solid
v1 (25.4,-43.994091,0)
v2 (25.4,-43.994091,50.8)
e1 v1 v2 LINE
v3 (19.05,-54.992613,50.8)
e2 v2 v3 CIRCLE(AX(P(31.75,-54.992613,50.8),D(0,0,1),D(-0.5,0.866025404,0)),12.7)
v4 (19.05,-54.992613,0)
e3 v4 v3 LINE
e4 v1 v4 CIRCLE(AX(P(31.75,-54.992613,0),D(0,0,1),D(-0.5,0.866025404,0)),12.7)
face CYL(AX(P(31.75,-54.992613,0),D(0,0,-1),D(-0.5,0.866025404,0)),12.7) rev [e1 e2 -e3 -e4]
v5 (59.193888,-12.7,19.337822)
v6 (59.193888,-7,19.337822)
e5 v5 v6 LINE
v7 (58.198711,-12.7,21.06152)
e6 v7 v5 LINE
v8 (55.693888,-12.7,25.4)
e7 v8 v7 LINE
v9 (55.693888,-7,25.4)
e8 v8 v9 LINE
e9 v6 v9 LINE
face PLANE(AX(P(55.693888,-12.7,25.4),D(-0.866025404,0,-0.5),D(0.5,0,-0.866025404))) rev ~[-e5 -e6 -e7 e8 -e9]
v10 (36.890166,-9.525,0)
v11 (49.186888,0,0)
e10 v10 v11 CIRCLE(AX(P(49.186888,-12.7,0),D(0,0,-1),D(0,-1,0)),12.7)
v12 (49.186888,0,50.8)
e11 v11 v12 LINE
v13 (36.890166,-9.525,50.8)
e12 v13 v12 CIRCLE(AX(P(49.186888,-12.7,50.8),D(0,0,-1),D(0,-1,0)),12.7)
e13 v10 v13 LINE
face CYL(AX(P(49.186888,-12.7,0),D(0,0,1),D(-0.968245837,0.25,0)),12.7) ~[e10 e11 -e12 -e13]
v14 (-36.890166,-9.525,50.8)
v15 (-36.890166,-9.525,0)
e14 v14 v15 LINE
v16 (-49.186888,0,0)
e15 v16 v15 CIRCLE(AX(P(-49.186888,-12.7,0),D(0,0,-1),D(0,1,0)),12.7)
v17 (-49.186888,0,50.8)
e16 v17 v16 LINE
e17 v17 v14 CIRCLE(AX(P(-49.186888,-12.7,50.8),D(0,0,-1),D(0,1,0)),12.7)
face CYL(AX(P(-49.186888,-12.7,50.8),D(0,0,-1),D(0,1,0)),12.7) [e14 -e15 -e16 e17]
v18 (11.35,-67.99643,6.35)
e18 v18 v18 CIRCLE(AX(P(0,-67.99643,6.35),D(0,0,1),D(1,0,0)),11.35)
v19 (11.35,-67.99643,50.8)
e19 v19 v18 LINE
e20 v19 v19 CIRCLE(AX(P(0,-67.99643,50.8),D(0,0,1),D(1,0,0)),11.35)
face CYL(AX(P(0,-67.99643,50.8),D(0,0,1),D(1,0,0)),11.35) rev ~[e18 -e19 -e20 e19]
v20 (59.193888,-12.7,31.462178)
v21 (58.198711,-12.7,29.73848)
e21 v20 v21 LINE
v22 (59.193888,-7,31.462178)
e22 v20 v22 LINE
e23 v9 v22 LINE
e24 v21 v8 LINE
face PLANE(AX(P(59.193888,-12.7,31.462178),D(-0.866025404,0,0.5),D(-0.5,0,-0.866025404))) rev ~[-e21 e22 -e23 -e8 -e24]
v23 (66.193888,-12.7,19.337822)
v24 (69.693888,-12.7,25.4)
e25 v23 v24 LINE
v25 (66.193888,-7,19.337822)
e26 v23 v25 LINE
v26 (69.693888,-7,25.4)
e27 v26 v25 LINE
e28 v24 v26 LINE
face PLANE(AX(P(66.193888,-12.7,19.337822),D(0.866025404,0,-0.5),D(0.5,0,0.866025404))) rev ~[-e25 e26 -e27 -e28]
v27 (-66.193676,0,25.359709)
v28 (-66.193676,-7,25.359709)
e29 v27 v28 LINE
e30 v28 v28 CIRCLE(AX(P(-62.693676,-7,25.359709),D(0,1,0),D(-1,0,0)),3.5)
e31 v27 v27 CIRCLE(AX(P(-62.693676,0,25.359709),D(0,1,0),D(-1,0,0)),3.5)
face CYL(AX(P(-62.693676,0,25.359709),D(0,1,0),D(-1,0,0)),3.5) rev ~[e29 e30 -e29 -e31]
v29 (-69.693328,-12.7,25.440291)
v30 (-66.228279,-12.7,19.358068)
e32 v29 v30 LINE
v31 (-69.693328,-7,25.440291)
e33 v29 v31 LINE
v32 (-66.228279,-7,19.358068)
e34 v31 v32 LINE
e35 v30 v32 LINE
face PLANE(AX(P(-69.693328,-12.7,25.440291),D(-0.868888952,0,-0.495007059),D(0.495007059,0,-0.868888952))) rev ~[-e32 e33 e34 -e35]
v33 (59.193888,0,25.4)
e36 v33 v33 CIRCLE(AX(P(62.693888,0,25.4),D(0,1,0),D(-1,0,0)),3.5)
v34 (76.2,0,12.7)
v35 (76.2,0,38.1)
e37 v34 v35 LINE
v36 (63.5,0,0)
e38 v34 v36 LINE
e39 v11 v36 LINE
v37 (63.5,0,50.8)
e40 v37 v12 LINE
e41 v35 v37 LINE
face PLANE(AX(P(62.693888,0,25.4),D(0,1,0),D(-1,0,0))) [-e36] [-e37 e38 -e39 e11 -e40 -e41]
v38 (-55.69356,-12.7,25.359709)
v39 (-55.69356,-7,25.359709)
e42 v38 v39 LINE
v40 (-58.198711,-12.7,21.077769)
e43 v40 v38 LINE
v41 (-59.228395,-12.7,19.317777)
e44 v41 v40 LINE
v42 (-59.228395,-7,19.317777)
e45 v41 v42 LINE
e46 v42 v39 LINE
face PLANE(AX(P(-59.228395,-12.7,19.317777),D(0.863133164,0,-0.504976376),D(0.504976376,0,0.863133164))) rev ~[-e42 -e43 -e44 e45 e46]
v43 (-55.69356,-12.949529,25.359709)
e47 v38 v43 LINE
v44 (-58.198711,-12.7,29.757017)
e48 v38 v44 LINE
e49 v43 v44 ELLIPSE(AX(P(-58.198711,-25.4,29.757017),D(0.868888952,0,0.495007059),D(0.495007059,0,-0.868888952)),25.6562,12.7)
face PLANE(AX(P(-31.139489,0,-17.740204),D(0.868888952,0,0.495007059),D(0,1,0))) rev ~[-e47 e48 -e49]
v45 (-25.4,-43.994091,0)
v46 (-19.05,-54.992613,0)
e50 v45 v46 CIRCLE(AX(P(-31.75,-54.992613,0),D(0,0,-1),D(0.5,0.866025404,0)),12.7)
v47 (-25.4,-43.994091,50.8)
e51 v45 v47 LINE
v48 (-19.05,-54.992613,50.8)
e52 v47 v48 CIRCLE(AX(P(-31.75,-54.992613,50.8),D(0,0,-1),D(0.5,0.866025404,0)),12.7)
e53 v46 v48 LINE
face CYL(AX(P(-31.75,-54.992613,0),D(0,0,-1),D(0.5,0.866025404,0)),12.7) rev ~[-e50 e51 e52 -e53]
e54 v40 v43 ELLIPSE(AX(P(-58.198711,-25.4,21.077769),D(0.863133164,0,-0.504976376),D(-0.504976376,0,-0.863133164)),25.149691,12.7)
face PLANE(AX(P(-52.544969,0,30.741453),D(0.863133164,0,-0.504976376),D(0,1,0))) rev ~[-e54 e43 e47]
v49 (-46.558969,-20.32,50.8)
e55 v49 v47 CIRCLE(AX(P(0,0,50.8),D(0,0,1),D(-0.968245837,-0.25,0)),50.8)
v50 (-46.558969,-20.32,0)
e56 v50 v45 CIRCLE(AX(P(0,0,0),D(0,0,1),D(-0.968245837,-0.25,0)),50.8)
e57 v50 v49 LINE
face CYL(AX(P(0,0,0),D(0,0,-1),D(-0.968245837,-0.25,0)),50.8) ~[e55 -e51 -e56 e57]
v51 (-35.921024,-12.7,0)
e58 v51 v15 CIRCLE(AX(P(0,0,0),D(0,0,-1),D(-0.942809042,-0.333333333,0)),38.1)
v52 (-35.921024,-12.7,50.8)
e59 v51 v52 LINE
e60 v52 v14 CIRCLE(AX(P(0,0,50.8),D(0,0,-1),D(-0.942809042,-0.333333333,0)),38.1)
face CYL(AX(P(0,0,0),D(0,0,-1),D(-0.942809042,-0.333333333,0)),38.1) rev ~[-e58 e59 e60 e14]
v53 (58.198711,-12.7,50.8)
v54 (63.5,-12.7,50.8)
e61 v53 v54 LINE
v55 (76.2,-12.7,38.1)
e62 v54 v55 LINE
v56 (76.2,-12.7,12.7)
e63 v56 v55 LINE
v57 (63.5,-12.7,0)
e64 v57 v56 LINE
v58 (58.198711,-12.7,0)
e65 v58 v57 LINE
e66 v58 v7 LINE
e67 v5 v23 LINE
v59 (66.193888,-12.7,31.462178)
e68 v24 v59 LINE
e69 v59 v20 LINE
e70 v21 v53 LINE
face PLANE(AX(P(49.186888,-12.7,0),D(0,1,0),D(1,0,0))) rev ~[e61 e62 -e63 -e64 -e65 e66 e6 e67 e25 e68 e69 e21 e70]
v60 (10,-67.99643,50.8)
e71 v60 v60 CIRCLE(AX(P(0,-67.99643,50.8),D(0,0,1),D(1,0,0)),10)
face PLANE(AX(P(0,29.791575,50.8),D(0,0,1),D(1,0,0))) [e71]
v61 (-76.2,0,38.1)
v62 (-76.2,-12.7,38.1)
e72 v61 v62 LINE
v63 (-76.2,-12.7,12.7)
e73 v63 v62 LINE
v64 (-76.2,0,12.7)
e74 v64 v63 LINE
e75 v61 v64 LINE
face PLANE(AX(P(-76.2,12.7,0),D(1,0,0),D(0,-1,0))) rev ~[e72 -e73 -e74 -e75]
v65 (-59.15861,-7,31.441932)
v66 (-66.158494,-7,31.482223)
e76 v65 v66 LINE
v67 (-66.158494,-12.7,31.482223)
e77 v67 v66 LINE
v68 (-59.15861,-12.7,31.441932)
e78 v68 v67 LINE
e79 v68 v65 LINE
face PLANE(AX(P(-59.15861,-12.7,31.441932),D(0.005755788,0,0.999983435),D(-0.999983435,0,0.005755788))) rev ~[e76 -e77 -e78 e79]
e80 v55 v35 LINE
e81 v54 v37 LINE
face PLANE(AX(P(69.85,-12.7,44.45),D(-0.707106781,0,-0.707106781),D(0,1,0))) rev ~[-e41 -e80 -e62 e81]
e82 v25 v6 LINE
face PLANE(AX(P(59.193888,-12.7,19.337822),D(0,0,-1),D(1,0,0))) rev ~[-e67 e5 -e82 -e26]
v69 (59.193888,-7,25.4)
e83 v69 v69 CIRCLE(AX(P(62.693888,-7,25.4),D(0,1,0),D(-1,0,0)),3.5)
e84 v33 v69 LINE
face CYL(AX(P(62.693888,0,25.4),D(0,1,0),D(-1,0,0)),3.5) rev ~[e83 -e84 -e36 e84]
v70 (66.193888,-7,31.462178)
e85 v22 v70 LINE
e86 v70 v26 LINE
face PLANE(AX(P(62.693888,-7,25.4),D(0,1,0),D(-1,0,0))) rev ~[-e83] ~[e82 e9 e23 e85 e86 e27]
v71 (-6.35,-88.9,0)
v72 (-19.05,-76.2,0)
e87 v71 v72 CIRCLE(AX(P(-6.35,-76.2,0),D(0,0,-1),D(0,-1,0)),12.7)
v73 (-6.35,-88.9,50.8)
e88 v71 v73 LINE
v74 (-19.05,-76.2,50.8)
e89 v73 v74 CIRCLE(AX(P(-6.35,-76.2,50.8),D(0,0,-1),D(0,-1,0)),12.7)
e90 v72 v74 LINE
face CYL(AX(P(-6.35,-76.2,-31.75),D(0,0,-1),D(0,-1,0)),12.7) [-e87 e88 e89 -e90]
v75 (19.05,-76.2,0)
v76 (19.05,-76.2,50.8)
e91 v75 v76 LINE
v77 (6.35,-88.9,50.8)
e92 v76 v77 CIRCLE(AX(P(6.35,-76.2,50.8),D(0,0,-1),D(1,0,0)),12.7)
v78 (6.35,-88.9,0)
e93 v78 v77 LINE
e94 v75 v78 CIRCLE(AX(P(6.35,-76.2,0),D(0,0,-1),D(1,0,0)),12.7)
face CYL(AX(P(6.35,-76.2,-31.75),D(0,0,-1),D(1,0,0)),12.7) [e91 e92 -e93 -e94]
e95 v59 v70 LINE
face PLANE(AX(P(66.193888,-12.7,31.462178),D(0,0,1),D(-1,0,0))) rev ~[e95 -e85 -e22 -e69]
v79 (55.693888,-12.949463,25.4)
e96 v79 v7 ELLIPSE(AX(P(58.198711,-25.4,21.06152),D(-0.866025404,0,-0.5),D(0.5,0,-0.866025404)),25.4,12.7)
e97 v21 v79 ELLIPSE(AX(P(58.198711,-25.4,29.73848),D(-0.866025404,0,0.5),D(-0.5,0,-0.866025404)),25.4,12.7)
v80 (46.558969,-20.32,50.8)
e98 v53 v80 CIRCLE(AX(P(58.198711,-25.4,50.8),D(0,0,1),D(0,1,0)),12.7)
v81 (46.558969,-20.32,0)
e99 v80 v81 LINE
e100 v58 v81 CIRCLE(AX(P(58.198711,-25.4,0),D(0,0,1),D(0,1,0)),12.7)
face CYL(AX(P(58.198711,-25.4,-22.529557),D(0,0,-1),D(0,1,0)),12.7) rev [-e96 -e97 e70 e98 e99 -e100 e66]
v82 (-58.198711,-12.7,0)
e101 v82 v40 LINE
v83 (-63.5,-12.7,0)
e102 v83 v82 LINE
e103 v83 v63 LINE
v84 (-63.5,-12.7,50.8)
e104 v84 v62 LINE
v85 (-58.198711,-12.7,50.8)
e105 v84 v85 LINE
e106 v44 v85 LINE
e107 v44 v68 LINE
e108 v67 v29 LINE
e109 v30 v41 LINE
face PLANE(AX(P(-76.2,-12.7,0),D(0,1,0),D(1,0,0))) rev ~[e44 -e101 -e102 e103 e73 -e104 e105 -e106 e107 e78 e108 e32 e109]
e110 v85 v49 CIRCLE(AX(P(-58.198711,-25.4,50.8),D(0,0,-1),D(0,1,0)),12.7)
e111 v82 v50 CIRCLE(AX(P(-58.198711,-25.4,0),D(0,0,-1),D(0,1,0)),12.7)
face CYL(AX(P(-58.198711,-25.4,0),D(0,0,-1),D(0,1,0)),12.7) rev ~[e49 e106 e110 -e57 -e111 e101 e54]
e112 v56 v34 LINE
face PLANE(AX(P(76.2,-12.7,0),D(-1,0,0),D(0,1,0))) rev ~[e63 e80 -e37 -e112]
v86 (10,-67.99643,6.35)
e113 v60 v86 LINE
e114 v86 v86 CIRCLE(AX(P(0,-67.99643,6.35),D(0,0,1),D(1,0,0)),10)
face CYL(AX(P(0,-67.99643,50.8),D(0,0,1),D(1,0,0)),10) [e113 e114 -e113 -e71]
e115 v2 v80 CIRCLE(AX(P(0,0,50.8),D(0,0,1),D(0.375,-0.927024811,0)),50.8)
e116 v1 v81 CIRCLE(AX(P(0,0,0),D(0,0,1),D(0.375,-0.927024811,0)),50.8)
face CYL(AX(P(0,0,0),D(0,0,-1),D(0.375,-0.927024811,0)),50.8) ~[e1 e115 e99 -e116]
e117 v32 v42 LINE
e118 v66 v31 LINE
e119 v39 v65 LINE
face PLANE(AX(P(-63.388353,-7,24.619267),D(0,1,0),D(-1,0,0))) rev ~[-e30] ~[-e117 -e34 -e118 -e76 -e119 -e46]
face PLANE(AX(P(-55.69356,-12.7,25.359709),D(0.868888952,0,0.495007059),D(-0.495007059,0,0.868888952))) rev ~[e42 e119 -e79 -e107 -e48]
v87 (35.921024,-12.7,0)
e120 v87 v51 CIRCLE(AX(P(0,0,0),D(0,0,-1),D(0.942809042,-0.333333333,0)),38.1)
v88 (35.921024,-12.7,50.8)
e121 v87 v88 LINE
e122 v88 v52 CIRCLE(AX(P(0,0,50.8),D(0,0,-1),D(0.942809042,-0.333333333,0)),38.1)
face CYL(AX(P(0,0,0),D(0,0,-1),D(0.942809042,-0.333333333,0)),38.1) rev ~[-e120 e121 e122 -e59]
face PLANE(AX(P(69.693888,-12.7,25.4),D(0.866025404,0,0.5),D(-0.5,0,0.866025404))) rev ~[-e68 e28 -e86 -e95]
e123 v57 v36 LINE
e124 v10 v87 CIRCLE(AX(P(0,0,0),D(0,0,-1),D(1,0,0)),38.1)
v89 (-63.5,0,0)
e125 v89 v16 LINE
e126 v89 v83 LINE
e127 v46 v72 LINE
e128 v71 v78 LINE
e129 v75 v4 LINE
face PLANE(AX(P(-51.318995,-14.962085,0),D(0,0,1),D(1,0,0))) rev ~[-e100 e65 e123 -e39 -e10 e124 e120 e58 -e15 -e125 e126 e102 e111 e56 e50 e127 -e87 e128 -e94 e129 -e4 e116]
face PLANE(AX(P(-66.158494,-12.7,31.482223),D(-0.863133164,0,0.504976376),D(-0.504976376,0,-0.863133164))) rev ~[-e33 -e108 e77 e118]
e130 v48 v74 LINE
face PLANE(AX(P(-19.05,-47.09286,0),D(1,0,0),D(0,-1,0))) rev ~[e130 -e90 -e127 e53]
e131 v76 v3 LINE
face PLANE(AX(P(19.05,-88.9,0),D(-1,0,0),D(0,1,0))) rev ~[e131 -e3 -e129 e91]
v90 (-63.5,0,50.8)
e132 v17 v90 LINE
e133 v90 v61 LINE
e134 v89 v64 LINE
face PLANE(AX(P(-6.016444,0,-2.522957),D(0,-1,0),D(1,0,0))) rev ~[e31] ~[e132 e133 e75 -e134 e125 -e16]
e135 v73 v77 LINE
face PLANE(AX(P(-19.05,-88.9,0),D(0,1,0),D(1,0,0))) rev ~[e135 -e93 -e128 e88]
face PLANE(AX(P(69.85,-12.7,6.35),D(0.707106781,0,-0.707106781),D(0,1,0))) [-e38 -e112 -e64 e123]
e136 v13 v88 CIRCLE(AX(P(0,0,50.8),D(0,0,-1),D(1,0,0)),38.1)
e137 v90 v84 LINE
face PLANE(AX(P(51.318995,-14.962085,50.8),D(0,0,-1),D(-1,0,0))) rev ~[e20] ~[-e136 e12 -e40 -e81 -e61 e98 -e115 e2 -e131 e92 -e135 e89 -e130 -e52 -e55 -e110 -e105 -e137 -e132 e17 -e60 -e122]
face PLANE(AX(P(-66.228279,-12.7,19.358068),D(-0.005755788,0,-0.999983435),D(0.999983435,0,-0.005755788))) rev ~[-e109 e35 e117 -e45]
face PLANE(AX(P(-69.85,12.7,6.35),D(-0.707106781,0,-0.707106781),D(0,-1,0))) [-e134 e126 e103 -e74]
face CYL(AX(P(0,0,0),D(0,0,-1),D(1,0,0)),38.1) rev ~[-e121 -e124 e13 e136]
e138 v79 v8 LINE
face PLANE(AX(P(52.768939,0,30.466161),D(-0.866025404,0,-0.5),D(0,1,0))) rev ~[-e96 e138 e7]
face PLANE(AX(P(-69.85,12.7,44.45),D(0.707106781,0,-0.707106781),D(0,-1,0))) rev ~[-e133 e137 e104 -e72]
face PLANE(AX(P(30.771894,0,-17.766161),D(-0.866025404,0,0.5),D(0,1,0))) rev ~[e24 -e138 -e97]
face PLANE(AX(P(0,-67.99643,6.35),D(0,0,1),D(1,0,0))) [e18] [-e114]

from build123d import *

# Parameters (mm, degrees)
F1_DEPTH     = 50.8
F3_DEPTH     = 12.7
F4_SIZE      = 12.7
F5_R         = 11.35
F5_R_2       = 10
F6_DEPTH     = 44.45
F7_T1_DEPTH  = 50.8
F7_T6_DEPTH  = 73.3295570728
F7_T11_DEPTH = 73.3295570728
F7_T16_DEPTH = 73.3295570728
F7_T21_DEPTH = 73.3295570728
F7_T23_DEPTH = 114.3
F8_R         = 3.5
F9_DEPTH     = 50.801
F10_W        = 183.8439181447
F10_H        = 157.3934331536
F11_DEPTH    = 63.5
F12_R        = 12.7
F13_R        = 3.5
F13_W        = 17.6573731005
F13_H        = 18.0775066838
F14_DEPTH    = 7


# Not quite as in the source:
# - a fillet or chamfer that OpenCascade refuses, or shapes differently, is made with other operations: its cross-section is extruded or revolved along the edge and cut away or added


with BuildPart() as f1:
    # F0 (on Top) → F1 (new body)
    with BuildSketch(Plane.XY):
        with BuildLine():
            ThreePointArc((-35.9210244843, 12.7), (0, 38.1), (35.9210244843, 12.7))
            Line((35.9210244843, 12.7), (49.1868884968, 12.7))
            ThreePointArc((49.1868884968, 12.7), (0, 50.8), (-49.1868884968, 12.7))
            Line((-49.1868884968, 12.7), (-35.9210244843, 12.7))
        make_face()
        with BuildLine():
            ThreePointArc((-49.1868884968, -12.7), (-50.8, 0), (-49.1868884968, 12.7))
            Line((-49.1868884968, 12.7), (-76.2, 12.7))
            Line((-76.2, 12.7), (-76.2, -12.7))
            Line((-76.2, -12.7), (-49.1868884968, -12.7))
        make_face()
        with BuildLine():
            ThreePointArc((-35.9210244843, -12.7), (-38.1, 0), (-35.9210244843, 12.7))
            Line((-35.9210244843, 12.7), (-49.1868884968, 12.7))
            ThreePointArc((-49.1868884968, 12.7), (-50.8, 0), (-49.1868884968, -12.7))
            Line((-49.1868884968, -12.7), (-35.9210244843, -12.7))
        make_face()
        with BuildLine():
            ThreePointArc((35.9210244843, 12.7), (37.5513051228, 6.4427853895), (38.1, 0))
            ThreePointArc((38.1, 0), (37.5513051228, -6.4427853895), (35.9210244843, -12.7))
            Line((35.9210244843, -12.7), (49.1868884968, -12.7))
            ThreePointArc((49.1868884968, -12.7), (50.3951085704, -6.4010180581), (50.8, 0))
            ThreePointArc((50.8, 0), (50.3951085704, 6.4010180581), (49.1868884968, 12.7))
            Line((49.1868884968, 12.7), (35.9210244843, 12.7))
        make_face()
        with BuildLine():
            Line((76.2, 12.7), (49.1868884968, 12.7))
            ThreePointArc((49.1868884968, 12.7), (50.3951085704, 6.4010180581), (50.8, 0))
            ThreePointArc((50.8, 0), (50.3951085704, -6.4010180581), (49.1868884968, -12.7))
            Line((49.1868884968, -12.7), (76.2, -12.7))
            Line((76.2, -12.7), (76.2, 12.7))
        make_face()
        with BuildLine():
            ThreePointArc((-19.05, -32.9955678842), (-29.2989914869, -24.3552683798), (-35.9210244843, -12.7))
            Line((-35.9210244843, -12.7), (-49.1868884968, -12.7))
            ThreePointArc((-49.1868884968, -12.7), (-38.2071387235, -33.479165918), (-19.05, -47.0928603931))
            Line((-19.05, -47.0928603931), (-19.05, -32.9955678842))
        make_face()
        with BuildLine():
            Line((49.1868884968, -12.7), (35.9210244843, -12.7))
            ThreePointArc((35.9210244843, -12.7), (29.2989914869, -24.3552683798), (19.05, -32.9955678842))
            Line((19.05, -32.9955678842), (19.05, -47.0928603931))
            ThreePointArc((19.05, -47.0928603931), (38.2071387235, -33.479165918), (49.1868884968, -12.7))
        make_face()
        with BuildLine():
            Line((19.05, -47.0928603931), (19.05, -32.9955678842))
            ThreePointArc((19.05, -32.9955678842), (0, -38.1), (-19.05, -32.9955678842))
            Line((-19.05, -32.9955678842), (-19.05, -47.0928603931))
            ThreePointArc((-19.05, -47.0928603931), (0, -50.8), (19.05, -47.0928603931))
        make_face()
        with BuildLine():
            Line((19.05, -88.9), (19.05, -47.0928603931))
            ThreePointArc((19.05, -47.0928603931), (0, -50.8), (-19.05, -47.0928603931))
            Line((-19.05, -47.0928603931), (-19.05, -88.9))
            Line((-19.05, -88.9), (19.05, -88.9))
        make_face()
    extrude(amount=F1_DEPTH)

    # F2 (on face) → F3 (cut)
    with BuildSketch(Plane.XZ.offset(12.7)):
        Polygon((-55.6935602012, 25.3597094836), (-59.1586096141, 31.4419321502), (-66.1584936613, 31.4822226666), (-69.6933282956, 25.4402905164), (-66.2282788827, 19.3580678498), (-59.2283948355, 19.3177773334), align=None)
        Polygon((59.1938884968, 31.4621778265), (55.6938884968, 25.4), (59.1938884968, 19.3378221735), (66.1938884968, 19.3378221735), (69.6938884968, 25.4), (66.1938884968, 31.4621778265), align=None)
    extrude(amount=-F3_DEPTH, mode=Mode.SUBTRACT)

    # F4
    f4_edges = [f1.edges().sort_by_distance(p)[0] for p in [
        (-76.2, 0, 50.8),
        (-76.2, 0, 0),
        (76.2, 0, 50.8),
        (76.2, 0, 0),
    ]]
    chamfer(f4_edges, length=F4_SIZE)

    # F5 (on face) → F6 (cut)
    with BuildSketch(Plane.XY.offset(50.8)):
        with Locations((0, -67.9964301965)):
            Circle(F5_R)
        with Locations((0, -67.9964301965)):
            Circle(F5_R_2, mode=Mode.SUBTRACT)
    extrude(amount=-F6_DEPTH, mode=Mode.SUBTRACT)

    # F7: fillet of radius 12.7 on 8 edges, made by hand

    # F7_s2 → F7_t1 (join)
    with BuildSketch(Plane.XY):
        with BuildLine():
            ThreePointArc((-25.4, -43.9940905122), (-20.7514773719, -48.6426131403), (-19.05, -54.9926131403))
            Line((-19.05, -54.9926131403), (-19.05, -47.0928603931))
            ThreePointArc((-19.05, -47.0928603931), (-22.2789411484, -45.6540116672), (-25.4, -43.9940905122))
        make_face()
        with BuildLine():
            ThreePointArc((25.4, -43.9940905122), (20.7514773719, -48.6426131403), (19.05, -54.9926131403))
            Line((19.05, -54.9926131403), (19.05, -47.0928603931))
            ThreePointArc((19.05, -47.0928603931), (22.2789411484, -45.6540116672), (25.4, -43.9940905122))
        make_face()
    extrude(amount=F7_T1_DEPTH)


with BuildPart() as f7_tool4:
    # F7_s5 → F7_t6 (new body)
    with BuildSketch(Plane.XY):
        with BuildLine():
            ThreePointArc((58.1987113259, -12.7), (51.2426348456, -14.774417663), (46.5589690608, -20.32))
            ThreePointArc((46.5589690608, -20.32), (48.0243002017, -16.562203662), (49.1868884968, -12.7))
            Line((49.1868884968, -12.7), (58.1987113259, -12.7))
        make_face()
    extrude(amount=F7_T6_DEPTH)

    split(bisect_by=Plane(origin=(52.7689390007, 0, 30.4661611369), x_dir=(0, 1, 0), z_dir=(-0.8660254038, 0, -0.5)), keep=Keep.TOP)


with BuildPart() as f1_1:
    add(f1.part)

    # F7_t3: union F7_tool4
    add(f7_tool4.part)


with BuildPart() as f7_tool9:
    # F7_s10 → F7_t11 (new body)
    with BuildSketch(Plane.XY.offset(-22.5295570728)):
        with BuildLine():
            ThreePointArc((58.1987113259, -12.7), (51.2426348456, -14.774417663), (46.5589690608, -20.32))
            ThreePointArc((46.5589690608, -20.32), (48.0243002017, -16.562203662), (49.1868884968, -12.7))
            Line((49.1868884968, -12.7), (58.1987113259, -12.7))
        make_face()
    extrude(amount=F7_T11_DEPTH)

    split(bisect_by=Plane(origin=(30.7718937446, 0, -17.7661611369), x_dir=(0, 1, 0), z_dir=(-0.8660254038, 0, 0.5)), keep=Keep.TOP)


with BuildPart() as f1_2:
    add(f1_1.part)

    # F7_t8: union F7_tool9
    add(f7_tool9.part)


with BuildPart() as f7_tool14:
    # F7_s15 → F7_t16 (new body)
    with BuildSketch(Plane.XY):
        with BuildLine():
            ThreePointArc((-58.1987113259, -12.7), (-51.2426348456, -14.774417663), (-46.5589690608, -20.32))
            ThreePointArc((-46.5589690608, -20.32), (-48.0243002017, -16.562203662), (-49.1868884968, -12.7))
            Line((-49.1868884968, -12.7), (-58.1987113259, -12.7))
        make_face()
    extrude(amount=F7_T16_DEPTH)

    split(bisect_by=Plane(origin=(-52.5449689068, 0, 30.7414534512), x_dir=(0, 1, 0), z_dir=(0.8631331643, 0, -0.5049763763)), keep=Keep.TOP)


with BuildPart() as f1_3:
    add(f1_2.part)

    # F7_t13: union F7_tool14
    add(f7_tool14.part)


with BuildPart() as f7_tool19:
    # F7_s20 → F7_t21 (new body)
    with BuildSketch(Plane.XY.offset(-22.5295570728)):
        with BuildLine():
            ThreePointArc((-58.1987113259, -12.7), (-51.2426348456, -14.774417663), (-46.5589690608, -20.32))
            ThreePointArc((-46.5589690608, -20.32), (-48.0243002017, -16.562203662), (-49.1868884968, -12.7))
            Line((-49.1868884968, -12.7), (-58.1987113259, -12.7))
        make_face()
    extrude(amount=F7_T21_DEPTH)

    split(bisect_by=Plane(origin=(-31.1394890128, 0, -17.7402035465), x_dir=(0, 1, 0), z_dir=(0.8688889524, 0, 0.495007059)), keep=Keep.TOP)


with BuildPart() as f1_4:
    add(f1_3.part)

    # F7_t18: union F7_tool19
    add(f7_tool19.part)

    # F7_s24 → F7_t23 (cut)
    with BuildSketch(Plane.XY.offset(-31.75)):
        with BuildLine():
            ThreePointArc((-6.35, -88.9), (-15.3302561211, -85.1802561211), (-19.05, -76.2))
            Line((-19.05, -76.2), (-19.05, -88.9))
            Line((-19.05, -88.9), (-6.35, -88.9))
        make_face()
        with BuildLine():
            ThreePointArc((19.05, -76.2), (15.3302561211, -85.1802561211), (6.35, -88.9))
            Line((6.35, -88.9), (19.05, -88.9))
            Line((19.05, -88.9), (19.05, -76.2))
        make_face()
    extrude(amount=F7_T23_DEPTH, mode=Mode.SUBTRACT)

    # F8 (on face) → F9 (cut, through all)
    with BuildSketch(Plane.XZ):
        with Locations((-62.6585516377, 25.4402905164)):
            Circle(F8_R)
        with Locations((62.6938884968, 25.4402905164)):
            Circle(F8_R)
    extrude(amount=-F9_DEPTH, mode=Mode.SUBTRACT)

    # F10 (on Front) → F11 (cut)
    with BuildSketch(Plane.XZ):
        with Locations((-6.0164444149, -2.5229565799)):
            Rectangle(F10_W, F10_H)
    extrude(amount=-F11_DEPTH, mode=Mode.SUBTRACT)

    # F12
    f12_edges = [f1_4.edges().sort_by_distance(p)[0] for p in [
        (38.1, 0, 25.4),
        (-38.1, 0, 25.4),
    ]]
    fillet(f12_edges, radius=F12_R)

    # F13 (on face) → F14 (join)
    with BuildSketch(Plane(origin=(0, 0, 0), x_dir=(-1, 0, 0), z_dir=(0, 1, 0))):
        Polygon((-55.6938884968, 25.4), (-59.1938884968, 31.4621778265), (-66.1938884968, 31.4621778265), (-69.6938884968, 25.4), (-66.1938884968, 19.3378221735), (-59.1938884968, 19.3378221735), align=None)
        with Locations((-62.6938884968, 25.4)):
            Circle(F13_R, mode=Mode.SUBTRACT)
        with Locations((63.3883532137, 24.6192668565)):
            Rectangle(F13_W, F13_H)
        with Locations((62.6936761559, 25.3597094836)):
            Circle(F13_R, mode=Mode.SUBTRACT)
    extrude(amount=-F14_DEPTH)


solid = f1_4.part
